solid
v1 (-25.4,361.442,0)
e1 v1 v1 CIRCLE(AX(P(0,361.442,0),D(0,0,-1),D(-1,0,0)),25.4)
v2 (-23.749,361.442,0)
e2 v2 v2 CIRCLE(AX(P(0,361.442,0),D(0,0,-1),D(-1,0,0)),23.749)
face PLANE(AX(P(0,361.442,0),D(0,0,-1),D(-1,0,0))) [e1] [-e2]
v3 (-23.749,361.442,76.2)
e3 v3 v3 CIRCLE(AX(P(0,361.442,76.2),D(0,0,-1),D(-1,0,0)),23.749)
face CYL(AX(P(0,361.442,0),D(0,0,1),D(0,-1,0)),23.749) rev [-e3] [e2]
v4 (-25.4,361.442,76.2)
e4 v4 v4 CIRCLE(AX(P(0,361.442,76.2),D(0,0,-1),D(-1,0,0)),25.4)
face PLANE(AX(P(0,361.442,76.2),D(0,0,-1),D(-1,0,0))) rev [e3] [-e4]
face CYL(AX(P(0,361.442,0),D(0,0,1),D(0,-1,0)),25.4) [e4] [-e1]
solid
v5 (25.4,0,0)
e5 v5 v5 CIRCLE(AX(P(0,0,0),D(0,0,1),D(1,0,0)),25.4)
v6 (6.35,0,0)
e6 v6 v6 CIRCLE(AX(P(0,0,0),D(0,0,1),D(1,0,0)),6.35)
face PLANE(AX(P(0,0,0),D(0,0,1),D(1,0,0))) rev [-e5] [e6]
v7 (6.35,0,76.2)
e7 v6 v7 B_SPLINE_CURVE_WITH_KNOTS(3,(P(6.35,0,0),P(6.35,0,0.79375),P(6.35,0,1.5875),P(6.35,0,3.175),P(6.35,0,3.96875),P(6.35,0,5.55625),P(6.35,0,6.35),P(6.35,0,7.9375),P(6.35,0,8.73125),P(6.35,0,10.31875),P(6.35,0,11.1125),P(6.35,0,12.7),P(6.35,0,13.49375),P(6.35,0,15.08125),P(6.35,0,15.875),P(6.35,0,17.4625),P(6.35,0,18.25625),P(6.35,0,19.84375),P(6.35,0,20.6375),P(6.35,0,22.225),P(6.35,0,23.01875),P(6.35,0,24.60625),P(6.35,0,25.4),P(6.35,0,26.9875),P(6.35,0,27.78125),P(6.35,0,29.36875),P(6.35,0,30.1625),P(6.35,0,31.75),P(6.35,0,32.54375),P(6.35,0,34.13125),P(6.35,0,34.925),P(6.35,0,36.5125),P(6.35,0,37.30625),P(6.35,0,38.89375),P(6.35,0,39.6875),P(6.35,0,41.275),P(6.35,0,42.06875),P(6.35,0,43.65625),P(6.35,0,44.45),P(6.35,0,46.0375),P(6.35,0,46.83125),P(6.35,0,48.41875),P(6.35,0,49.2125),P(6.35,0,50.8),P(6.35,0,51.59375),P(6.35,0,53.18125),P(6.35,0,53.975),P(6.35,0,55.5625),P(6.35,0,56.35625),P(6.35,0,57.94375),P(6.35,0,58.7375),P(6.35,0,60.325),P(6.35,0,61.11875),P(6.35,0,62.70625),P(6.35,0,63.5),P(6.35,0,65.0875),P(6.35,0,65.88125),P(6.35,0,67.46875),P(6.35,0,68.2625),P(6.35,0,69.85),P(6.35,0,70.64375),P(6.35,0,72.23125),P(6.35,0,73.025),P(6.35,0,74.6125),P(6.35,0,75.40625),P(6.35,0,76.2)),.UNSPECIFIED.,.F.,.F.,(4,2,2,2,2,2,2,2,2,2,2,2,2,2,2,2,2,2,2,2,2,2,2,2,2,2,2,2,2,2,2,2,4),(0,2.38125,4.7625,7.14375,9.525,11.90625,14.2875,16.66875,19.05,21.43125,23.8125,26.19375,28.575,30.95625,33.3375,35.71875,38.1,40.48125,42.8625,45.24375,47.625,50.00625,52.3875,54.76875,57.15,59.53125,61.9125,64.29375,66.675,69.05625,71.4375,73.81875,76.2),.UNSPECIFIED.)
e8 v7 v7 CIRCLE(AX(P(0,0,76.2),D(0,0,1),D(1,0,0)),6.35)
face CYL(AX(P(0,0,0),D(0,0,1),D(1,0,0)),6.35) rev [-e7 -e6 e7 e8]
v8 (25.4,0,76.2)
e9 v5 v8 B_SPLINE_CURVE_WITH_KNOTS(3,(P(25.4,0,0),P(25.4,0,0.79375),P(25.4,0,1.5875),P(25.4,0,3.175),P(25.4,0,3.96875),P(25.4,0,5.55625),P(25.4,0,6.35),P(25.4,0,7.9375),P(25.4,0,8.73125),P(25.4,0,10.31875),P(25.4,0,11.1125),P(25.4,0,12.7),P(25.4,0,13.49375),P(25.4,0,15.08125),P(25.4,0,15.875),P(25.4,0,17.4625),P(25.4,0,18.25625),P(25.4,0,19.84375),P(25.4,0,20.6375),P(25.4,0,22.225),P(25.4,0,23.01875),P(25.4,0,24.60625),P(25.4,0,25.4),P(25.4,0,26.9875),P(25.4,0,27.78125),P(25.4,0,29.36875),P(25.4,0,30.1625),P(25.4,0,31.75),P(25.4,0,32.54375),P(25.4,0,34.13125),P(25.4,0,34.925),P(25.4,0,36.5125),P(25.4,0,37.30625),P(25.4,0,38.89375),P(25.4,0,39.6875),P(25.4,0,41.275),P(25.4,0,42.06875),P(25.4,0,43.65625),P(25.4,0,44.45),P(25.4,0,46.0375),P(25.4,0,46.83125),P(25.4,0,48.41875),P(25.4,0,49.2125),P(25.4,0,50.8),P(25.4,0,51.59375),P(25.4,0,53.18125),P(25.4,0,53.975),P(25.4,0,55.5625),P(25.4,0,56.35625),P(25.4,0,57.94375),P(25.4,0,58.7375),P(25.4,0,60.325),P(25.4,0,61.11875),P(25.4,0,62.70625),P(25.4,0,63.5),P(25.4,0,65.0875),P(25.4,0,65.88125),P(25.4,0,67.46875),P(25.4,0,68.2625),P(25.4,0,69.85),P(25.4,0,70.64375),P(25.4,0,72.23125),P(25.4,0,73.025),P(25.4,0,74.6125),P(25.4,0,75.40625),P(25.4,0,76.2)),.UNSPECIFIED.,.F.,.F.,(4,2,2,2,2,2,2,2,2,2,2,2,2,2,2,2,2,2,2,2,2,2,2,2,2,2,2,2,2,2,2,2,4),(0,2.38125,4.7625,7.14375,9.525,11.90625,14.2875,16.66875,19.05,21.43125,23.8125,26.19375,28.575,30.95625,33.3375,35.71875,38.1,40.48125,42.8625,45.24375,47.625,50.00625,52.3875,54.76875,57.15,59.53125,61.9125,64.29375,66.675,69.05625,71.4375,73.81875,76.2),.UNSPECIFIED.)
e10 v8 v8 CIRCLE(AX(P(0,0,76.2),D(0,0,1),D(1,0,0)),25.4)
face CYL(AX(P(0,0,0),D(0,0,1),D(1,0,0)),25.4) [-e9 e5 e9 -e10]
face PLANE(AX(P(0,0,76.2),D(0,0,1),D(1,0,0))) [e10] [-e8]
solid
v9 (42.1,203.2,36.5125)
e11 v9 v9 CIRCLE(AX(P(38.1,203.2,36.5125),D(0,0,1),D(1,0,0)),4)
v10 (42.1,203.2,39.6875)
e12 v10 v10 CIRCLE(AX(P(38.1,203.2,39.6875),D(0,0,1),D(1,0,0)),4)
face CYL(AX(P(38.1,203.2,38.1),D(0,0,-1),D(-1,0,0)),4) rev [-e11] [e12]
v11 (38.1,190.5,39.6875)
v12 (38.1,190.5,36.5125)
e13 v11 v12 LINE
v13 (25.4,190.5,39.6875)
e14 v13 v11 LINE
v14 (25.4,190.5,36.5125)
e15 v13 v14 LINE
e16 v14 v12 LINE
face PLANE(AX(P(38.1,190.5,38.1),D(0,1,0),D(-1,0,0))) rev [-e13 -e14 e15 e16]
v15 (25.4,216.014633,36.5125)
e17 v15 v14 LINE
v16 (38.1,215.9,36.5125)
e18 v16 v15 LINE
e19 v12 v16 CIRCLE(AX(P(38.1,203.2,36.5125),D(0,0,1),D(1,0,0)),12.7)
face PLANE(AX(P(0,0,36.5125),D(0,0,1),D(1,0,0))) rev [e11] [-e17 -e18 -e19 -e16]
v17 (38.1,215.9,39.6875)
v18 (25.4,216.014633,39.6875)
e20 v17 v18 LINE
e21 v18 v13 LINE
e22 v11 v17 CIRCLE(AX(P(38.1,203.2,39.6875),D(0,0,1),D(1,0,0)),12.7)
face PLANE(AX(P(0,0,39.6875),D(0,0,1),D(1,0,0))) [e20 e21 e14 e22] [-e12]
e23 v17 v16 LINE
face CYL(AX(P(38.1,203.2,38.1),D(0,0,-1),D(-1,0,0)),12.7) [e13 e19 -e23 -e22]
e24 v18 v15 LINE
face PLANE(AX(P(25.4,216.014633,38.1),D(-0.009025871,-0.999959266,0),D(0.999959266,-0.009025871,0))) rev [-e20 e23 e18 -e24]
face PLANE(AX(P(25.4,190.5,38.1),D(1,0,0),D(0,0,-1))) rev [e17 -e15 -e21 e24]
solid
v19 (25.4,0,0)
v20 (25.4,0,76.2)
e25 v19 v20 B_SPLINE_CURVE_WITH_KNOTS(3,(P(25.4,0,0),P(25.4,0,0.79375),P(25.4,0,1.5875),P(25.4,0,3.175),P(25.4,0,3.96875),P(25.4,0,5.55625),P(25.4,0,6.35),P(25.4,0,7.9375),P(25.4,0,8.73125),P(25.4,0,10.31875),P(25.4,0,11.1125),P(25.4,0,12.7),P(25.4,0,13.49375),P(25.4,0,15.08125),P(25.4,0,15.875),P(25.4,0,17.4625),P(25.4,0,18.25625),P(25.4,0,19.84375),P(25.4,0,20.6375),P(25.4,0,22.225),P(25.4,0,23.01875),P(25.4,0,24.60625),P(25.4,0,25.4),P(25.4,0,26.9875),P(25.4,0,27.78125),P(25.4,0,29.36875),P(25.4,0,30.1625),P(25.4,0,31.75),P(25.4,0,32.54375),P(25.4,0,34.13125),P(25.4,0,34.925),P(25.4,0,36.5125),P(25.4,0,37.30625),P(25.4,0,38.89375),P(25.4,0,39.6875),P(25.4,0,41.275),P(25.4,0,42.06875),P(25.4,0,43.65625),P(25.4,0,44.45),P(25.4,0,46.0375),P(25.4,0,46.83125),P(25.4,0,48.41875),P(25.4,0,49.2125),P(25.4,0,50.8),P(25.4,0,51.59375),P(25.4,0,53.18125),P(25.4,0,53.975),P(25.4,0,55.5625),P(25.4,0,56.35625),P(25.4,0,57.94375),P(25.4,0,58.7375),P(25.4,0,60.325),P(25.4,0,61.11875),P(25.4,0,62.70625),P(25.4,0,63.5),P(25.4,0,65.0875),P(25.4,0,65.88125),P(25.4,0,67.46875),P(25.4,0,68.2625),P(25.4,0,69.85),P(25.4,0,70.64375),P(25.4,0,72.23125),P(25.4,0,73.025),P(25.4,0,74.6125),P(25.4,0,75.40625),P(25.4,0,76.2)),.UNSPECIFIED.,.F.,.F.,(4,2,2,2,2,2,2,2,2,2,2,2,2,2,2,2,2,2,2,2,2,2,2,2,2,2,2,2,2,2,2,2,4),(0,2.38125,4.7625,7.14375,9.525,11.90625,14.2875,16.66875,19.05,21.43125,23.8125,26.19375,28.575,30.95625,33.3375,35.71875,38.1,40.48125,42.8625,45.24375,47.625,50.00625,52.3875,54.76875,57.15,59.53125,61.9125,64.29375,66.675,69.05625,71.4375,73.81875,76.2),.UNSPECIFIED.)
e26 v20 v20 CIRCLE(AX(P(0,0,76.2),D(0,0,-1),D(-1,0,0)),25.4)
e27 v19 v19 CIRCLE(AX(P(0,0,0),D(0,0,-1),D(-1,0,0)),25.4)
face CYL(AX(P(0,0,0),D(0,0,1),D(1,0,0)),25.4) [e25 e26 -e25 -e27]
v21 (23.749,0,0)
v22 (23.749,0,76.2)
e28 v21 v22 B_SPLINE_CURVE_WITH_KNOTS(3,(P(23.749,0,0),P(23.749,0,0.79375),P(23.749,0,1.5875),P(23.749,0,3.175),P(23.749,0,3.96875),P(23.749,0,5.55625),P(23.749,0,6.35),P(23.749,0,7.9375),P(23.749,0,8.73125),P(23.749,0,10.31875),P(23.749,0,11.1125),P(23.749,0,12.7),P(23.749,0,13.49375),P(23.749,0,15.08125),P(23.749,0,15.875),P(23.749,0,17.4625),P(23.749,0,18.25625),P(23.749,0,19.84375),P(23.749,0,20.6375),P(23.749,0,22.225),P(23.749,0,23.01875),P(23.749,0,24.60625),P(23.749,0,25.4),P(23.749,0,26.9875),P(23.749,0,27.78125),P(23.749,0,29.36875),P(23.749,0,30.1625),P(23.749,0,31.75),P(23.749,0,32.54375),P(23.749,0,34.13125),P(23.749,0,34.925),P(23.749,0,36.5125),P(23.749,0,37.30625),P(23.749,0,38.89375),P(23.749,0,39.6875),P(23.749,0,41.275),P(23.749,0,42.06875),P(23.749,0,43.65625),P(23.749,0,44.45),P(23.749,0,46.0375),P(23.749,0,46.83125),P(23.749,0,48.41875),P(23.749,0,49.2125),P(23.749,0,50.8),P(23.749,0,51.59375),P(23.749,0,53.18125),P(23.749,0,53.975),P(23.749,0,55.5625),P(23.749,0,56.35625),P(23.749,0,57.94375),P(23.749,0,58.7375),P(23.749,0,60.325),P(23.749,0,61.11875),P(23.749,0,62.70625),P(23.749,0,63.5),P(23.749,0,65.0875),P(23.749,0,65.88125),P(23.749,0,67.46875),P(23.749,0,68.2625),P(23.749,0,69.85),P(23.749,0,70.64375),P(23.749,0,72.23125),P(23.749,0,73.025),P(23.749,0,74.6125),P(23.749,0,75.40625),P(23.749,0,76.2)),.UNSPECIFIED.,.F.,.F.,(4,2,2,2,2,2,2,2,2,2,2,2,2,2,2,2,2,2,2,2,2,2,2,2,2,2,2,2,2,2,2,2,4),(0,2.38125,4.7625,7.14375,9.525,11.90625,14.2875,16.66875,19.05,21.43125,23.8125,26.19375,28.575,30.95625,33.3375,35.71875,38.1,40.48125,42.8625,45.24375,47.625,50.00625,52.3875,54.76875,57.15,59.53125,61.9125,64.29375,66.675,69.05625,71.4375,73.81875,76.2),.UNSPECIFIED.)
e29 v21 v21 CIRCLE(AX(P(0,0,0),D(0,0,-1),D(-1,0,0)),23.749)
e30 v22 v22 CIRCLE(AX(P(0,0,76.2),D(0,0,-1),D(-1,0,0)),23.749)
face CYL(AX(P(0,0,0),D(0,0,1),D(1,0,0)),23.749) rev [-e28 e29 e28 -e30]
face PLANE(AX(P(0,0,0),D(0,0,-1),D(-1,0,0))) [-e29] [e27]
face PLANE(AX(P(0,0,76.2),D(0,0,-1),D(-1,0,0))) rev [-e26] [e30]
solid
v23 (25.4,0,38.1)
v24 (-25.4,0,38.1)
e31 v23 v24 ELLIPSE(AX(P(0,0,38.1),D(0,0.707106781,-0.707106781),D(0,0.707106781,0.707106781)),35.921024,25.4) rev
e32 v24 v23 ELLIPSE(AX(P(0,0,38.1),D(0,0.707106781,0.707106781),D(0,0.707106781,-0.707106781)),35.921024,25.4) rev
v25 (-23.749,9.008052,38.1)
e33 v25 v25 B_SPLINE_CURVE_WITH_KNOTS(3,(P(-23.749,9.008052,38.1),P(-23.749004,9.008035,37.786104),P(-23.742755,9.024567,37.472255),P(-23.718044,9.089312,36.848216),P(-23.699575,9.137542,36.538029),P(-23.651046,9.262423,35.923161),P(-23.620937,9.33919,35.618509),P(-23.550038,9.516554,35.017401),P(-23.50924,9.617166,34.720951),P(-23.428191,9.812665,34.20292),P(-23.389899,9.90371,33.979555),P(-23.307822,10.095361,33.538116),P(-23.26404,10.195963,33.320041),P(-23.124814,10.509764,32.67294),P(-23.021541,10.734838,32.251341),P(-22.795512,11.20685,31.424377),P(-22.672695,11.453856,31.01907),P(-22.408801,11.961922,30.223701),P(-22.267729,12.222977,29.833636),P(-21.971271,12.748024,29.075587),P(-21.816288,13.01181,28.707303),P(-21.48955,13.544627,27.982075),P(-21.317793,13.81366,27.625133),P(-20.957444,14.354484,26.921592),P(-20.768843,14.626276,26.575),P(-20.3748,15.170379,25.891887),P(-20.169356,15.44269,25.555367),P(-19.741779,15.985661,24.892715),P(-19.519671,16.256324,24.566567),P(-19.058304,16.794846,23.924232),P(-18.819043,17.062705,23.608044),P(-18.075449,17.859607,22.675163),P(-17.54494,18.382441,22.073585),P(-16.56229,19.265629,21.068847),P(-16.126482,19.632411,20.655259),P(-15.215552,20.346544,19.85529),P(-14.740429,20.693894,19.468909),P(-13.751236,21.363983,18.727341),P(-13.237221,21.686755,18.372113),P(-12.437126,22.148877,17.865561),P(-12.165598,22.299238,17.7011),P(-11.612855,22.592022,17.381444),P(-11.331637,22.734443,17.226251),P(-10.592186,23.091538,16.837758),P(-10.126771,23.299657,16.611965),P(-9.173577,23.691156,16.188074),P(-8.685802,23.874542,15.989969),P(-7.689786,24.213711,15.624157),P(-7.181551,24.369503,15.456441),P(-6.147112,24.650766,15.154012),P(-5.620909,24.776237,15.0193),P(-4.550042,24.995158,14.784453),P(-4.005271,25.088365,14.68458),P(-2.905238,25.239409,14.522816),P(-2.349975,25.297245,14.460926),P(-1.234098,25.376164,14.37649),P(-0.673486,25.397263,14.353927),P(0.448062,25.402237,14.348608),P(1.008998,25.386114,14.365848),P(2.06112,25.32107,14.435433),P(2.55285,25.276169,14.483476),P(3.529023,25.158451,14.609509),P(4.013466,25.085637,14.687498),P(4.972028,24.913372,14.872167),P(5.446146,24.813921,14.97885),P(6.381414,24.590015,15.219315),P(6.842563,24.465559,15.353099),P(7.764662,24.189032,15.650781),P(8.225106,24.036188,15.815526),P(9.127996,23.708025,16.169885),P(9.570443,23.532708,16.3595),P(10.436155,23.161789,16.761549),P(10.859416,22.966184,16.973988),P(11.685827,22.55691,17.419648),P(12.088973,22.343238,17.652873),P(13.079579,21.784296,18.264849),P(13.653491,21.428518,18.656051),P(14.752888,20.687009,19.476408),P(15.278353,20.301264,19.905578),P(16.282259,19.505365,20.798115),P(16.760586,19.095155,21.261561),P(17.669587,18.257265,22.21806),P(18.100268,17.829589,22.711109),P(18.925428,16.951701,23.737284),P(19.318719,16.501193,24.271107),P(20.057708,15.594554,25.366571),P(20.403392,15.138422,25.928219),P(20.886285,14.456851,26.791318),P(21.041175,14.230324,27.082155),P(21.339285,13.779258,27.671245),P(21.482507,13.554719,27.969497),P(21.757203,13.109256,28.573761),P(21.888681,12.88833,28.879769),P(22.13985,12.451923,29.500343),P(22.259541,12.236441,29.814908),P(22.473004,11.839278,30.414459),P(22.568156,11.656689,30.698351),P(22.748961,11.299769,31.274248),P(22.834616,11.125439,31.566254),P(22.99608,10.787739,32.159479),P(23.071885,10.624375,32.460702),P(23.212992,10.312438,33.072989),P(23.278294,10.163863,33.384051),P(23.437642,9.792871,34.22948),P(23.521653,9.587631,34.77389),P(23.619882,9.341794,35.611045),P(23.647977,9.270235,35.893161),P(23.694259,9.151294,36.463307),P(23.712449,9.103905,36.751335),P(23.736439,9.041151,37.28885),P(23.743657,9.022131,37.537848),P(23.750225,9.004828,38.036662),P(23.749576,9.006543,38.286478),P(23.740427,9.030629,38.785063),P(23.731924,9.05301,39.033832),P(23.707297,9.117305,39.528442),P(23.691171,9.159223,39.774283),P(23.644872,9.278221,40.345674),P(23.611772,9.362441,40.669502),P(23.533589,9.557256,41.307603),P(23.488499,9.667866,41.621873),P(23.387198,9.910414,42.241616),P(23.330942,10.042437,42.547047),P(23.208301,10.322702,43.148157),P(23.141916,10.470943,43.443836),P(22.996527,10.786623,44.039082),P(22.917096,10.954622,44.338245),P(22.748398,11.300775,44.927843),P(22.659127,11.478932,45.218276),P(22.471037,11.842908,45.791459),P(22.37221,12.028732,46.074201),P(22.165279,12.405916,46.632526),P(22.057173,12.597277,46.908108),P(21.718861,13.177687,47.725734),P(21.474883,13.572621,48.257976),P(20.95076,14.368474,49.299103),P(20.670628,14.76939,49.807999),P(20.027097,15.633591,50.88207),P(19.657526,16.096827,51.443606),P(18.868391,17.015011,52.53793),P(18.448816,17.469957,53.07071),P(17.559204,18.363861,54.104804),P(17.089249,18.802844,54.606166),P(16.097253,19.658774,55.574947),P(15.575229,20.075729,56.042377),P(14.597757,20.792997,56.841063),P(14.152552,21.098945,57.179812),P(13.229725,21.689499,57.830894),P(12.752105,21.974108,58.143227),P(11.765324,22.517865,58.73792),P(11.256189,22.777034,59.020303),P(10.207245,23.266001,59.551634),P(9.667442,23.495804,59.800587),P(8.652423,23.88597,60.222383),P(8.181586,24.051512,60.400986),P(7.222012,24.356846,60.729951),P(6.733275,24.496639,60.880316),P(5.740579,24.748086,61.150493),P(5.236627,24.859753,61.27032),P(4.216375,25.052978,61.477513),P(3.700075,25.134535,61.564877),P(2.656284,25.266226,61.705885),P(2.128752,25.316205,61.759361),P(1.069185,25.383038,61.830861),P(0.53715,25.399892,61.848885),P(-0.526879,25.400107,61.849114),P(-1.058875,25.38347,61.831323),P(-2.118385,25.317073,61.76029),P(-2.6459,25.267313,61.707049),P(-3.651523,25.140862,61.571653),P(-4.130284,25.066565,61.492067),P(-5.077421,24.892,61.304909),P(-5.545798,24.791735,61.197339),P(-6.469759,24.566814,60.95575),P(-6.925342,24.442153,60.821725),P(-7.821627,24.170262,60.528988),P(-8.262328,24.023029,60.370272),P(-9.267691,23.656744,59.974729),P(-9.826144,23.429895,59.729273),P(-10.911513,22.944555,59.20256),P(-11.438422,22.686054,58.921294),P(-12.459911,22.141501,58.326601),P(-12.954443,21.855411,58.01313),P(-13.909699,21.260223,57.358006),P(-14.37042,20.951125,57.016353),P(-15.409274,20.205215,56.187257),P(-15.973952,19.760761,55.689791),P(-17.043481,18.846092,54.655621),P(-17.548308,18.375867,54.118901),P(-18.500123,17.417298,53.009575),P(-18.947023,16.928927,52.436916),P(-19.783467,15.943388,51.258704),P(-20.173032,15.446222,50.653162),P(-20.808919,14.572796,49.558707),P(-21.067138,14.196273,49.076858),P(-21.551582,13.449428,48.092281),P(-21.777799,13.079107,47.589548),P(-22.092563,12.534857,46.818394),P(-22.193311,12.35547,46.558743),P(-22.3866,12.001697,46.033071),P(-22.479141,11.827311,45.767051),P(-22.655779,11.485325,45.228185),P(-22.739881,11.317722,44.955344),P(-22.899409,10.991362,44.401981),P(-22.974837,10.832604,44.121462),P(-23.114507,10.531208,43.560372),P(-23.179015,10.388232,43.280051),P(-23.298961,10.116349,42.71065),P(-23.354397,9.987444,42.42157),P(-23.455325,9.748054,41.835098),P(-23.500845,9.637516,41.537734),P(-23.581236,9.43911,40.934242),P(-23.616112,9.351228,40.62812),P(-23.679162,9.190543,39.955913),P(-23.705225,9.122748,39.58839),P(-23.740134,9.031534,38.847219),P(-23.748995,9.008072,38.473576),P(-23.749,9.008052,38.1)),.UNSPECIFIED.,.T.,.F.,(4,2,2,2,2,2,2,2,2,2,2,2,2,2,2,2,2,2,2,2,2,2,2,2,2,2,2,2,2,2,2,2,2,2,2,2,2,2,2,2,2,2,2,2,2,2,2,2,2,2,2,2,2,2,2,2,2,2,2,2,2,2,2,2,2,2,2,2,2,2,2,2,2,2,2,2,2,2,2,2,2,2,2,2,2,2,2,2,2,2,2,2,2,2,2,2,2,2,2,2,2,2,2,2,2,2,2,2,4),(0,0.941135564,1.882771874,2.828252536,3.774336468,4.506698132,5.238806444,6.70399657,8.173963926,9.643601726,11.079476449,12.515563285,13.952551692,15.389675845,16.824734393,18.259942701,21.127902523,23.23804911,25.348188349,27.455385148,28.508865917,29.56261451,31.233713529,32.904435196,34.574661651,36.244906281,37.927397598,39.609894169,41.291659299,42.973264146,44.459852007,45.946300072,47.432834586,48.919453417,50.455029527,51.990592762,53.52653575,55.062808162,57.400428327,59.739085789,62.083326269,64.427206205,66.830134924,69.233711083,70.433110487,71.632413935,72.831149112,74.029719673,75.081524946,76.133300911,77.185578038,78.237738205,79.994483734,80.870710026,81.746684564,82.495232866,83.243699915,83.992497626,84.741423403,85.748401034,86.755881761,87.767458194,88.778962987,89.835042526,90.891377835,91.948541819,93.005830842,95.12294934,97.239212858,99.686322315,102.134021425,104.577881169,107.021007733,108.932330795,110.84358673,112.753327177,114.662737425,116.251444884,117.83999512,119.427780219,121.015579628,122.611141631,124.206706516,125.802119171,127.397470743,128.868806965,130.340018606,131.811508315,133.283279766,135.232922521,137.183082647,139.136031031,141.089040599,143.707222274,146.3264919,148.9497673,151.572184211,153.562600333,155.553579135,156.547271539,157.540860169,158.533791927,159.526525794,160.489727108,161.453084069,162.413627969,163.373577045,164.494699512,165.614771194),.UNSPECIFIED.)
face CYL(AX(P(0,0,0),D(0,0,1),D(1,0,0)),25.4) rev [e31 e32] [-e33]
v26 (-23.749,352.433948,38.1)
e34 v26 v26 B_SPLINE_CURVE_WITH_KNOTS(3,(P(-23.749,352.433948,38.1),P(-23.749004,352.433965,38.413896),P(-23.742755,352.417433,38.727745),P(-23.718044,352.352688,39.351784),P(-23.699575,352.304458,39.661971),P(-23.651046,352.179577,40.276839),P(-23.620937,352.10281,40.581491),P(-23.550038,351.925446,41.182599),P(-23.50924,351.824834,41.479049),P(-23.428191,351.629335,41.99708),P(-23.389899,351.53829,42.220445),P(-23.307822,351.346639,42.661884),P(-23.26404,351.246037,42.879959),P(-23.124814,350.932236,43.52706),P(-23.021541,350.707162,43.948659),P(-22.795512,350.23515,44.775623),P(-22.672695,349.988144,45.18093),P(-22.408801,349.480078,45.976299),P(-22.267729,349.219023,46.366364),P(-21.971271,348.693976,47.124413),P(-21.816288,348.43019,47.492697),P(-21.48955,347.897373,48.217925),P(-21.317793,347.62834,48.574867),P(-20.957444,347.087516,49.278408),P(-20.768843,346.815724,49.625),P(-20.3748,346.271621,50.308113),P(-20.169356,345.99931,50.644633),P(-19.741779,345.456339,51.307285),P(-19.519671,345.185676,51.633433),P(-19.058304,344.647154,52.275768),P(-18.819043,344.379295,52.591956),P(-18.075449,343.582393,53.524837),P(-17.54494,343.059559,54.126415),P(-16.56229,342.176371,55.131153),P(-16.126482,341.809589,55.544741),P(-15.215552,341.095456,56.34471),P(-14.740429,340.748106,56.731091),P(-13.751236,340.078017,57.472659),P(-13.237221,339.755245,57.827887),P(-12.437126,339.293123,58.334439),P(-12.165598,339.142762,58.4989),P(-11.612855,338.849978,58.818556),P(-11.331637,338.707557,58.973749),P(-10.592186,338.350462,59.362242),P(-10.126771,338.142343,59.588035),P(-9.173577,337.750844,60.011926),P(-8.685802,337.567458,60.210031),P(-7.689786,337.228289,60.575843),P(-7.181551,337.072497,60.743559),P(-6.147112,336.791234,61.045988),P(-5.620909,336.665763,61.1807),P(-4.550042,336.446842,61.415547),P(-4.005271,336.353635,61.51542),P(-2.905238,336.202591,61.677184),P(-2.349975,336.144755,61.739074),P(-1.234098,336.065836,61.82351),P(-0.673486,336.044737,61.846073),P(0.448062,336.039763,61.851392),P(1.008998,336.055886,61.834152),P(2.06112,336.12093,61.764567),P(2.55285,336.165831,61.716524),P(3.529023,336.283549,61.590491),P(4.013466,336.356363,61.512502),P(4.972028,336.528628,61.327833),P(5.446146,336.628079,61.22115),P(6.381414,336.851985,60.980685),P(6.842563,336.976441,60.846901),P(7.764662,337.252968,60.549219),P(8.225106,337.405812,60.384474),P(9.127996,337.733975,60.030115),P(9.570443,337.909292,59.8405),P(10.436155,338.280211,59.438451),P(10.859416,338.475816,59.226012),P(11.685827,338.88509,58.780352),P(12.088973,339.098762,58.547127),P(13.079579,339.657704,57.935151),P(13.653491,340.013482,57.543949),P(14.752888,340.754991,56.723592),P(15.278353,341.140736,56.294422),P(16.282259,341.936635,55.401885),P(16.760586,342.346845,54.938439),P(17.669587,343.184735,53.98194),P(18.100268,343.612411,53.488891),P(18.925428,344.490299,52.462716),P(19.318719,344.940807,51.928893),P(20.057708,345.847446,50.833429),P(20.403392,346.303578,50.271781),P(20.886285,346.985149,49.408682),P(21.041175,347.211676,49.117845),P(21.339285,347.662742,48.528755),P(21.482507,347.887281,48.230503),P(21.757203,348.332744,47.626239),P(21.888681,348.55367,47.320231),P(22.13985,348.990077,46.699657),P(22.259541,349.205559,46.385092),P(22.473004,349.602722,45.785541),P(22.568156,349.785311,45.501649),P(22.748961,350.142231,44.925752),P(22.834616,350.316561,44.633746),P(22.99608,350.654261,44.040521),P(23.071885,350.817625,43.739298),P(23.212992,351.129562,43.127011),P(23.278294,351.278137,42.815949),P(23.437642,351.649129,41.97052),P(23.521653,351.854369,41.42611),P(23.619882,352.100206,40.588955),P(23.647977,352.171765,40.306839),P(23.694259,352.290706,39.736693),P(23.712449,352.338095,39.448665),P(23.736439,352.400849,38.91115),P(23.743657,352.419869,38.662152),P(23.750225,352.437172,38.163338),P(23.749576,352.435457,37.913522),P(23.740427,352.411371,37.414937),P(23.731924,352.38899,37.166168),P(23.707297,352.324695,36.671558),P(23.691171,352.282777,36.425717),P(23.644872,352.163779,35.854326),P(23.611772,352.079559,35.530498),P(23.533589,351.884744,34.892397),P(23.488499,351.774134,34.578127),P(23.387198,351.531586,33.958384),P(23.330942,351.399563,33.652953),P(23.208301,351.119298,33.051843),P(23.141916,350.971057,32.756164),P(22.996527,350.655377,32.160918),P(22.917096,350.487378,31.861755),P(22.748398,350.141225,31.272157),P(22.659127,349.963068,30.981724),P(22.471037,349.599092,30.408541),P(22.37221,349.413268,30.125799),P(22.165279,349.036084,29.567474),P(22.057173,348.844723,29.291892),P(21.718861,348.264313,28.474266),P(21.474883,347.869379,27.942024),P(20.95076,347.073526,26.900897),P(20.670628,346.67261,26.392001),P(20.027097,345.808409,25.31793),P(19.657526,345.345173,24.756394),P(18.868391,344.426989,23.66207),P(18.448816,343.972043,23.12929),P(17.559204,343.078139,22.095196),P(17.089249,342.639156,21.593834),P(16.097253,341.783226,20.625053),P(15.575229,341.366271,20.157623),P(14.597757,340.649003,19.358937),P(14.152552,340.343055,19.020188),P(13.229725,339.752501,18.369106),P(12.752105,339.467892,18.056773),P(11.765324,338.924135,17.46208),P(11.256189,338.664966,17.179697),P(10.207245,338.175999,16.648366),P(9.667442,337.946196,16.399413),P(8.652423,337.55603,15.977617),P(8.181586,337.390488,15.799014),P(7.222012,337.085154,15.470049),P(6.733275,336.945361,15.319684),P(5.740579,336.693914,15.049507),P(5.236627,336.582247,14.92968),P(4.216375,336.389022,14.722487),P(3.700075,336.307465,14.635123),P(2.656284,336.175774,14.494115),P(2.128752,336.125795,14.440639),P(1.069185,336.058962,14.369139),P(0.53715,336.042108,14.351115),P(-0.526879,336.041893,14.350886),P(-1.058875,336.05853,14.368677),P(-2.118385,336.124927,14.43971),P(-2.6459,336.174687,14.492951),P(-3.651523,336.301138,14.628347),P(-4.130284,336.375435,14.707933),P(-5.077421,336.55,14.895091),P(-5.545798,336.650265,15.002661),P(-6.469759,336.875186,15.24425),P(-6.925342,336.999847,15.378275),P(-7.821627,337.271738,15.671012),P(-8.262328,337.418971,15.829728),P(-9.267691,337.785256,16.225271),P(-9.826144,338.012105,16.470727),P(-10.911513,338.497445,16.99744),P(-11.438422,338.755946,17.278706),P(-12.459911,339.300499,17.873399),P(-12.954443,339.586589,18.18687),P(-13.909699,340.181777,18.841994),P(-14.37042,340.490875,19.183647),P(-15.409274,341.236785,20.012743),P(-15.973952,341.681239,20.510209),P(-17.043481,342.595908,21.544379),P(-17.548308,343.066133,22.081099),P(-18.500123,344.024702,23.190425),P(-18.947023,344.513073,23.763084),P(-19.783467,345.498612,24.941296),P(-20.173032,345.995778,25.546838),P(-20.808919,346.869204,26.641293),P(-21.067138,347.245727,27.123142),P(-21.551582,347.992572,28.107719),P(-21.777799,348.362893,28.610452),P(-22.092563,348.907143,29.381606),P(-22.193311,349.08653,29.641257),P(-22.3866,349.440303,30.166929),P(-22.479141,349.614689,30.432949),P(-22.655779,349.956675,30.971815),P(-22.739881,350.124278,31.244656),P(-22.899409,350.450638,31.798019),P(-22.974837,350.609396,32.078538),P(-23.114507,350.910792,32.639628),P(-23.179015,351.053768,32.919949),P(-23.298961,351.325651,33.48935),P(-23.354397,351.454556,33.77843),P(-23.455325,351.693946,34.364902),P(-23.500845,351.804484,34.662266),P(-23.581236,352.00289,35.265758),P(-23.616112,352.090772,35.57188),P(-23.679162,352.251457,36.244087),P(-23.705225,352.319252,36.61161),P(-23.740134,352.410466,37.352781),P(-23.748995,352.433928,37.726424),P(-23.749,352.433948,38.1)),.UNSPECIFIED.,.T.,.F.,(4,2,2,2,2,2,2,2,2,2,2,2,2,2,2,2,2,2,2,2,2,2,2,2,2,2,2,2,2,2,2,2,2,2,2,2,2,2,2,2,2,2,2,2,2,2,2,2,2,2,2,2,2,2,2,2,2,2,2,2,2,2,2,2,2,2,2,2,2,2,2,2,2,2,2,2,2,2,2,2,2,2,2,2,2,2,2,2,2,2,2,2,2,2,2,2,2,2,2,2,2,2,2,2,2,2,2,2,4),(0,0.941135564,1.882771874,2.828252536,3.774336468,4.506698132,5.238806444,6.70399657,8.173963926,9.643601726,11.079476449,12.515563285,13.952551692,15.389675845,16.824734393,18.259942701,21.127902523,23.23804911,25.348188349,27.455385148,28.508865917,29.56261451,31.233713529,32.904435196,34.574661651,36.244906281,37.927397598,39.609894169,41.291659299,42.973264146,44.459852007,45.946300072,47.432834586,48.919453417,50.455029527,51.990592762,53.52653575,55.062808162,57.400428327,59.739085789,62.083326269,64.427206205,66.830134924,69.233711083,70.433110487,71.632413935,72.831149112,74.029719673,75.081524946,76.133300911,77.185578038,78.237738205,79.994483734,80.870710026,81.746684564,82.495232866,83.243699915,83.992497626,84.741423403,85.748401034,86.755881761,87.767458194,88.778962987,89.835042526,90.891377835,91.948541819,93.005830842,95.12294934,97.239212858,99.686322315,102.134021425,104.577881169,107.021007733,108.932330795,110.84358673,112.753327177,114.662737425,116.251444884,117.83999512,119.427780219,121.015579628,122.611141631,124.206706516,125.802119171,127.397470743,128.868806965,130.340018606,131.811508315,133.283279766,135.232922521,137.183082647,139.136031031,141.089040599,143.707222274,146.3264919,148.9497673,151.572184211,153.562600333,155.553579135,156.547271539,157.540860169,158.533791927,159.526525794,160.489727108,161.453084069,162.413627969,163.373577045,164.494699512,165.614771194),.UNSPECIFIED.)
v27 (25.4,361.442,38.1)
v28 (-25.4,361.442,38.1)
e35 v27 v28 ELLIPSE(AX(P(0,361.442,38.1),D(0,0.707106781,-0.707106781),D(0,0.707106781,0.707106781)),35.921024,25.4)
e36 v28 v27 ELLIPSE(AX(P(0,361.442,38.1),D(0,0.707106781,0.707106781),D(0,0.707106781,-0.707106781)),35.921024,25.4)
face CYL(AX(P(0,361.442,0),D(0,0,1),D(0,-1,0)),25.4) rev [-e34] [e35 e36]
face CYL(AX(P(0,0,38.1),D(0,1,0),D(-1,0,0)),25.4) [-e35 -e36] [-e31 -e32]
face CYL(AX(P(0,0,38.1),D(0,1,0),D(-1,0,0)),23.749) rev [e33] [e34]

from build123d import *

# Parameters (mm, degrees)
AL_START                                     = -1e-07
AL_ROUND_TUBING_2_OD_X_0_063_WALL_1_OUTL_R   = 25.4
AL_ROUND_TUBING_2_OD_X_0_063_WALL_1_OUTL_R_2 = 23.749
AL_ROUND_TUBING_2_OD_X_0_063_WALL_1_DEPTH    = 361.4420002
AL_START_2                                   = 12
AL_ROUND_TUBING_2_OD_X_0_063_WALL_1_2_DEPTH  = 52
AL_ROUND_TUBING_2_OD_X_0_063_WALL_1_3_OU_R   = 25.4
AL_ROUND_TUBING_2_OD_X_0_063_WALL_1_3_OU_R_2 = 23.749
AL_ROUND_TUBING_2_OD_X_0_063_WALL_1_3_DEPTH  = 76.2
AL_ROUND_TUBING_2_OD_X_0_063_WALL_1_4_OU_R   = 25.4
AL_ROUND_TUBING_2_OD_X_0_063_WALL_1_4_OU_R_2 = 23.749
AL_ROUND_TUBING_2_OD_X_0_063_WALL_1_4_DEPTH  = 76.2
SKETCH13_R                                   = 25.4
SKETCH13_R_2                                 = 6.35
BOSS_EXTRUDE1_DEPTH                          = 76.2
BOSS_EXTRUDE2_DEPTH                          = 1.5875
BOSS_EXTRUDE2_DEPTH_BACK                     = 1.5875
F_3DSKETCH2_R                                = 4


with BuildPart() as part:
    # Al round tubing 2 OD X 0.063 WALL(1): read off the stored shape, not the designer's step
    # Al round tubing 2 OD X 0.063 WALL(1) outl → Al round tubing 2 OD X 0.063 WALL(1) (new body)
    with BuildSketch(Plane(origin=(0, 0, 0), x_dir=(1, 0, 0), z_dir=(0, 1, 0)).offset(AL_START)):
        with Locations((0, -38.1)):
            Circle(AL_ROUND_TUBING_2_OD_X_0_063_WALL_1_OUTL_R)
        with Locations((0, -38.1)):
            Circle(AL_ROUND_TUBING_2_OD_X_0_063_WALL_1_OUTL_R_2, mode=Mode.SUBTRACT)
    extrude(amount=AL_ROUND_TUBING_2_OD_X_0_063_WALL_1_DEPTH)

    # Al round tubing 2 OD X 0.063 WALL_1 2 ou → Al round tubing 2 OD X 0.063 WALL_1 2 (cut)
    with BuildSketch(Plane.XY.offset(AL_START_2)):
        with BuildLine():
            Line((-25.4, 0), (25.4, 0))
            ThreePointArc((25.4, 0), (0, 25.4), (-25.4, 0))
        make_face()
        with BuildLine():
            Line((25.4, 361.442), (-25.4, 361.442))
            ThreePointArc((-25.4, 361.442), (0, 336.042), (25.4, 361.442))
        make_face()
    extrude(amount=AL_ROUND_TUBING_2_OD_X_0_063_WALL_1_2_DEPTH, mode=Mode.SUBTRACT)


with BuildPart() as body_2:
    # Al round tubing 2 OD X 0.063 WALL_1 3 ou → Al round tubing 2 OD X 0.063 WALL_1 3 (new body)
    with BuildSketch(Plane.XY):
        with Locations((0, 361.442)):
            Circle(AL_ROUND_TUBING_2_OD_X_0_063_WALL_1_3_OU_R)
        with Locations((0, 361.442)):
            Circle(AL_ROUND_TUBING_2_OD_X_0_063_WALL_1_3_OU_R_2, mode=Mode.SUBTRACT)
    extrude(amount=AL_ROUND_TUBING_2_OD_X_0_063_WALL_1_3_DEPTH)


with BuildPart() as body_3:
    # Al round tubing 2 OD X 0.063 WALL_1 4 ou → Al round tubing 2 OD X 0.063 WALL_1 4 (new body)
    with BuildSketch(Plane.XY):
        Circle(AL_ROUND_TUBING_2_OD_X_0_063_WALL_1_4_OU_R)
        Circle(AL_ROUND_TUBING_2_OD_X_0_063_WALL_1_4_OU_R_2, mode=Mode.SUBTRACT)
    extrude(amount=AL_ROUND_TUBING_2_OD_X_0_063_WALL_1_4_DEPTH)


with BuildPart() as body_4:
    # Sketch13 → Boss-Extrude1 (new body)
    with BuildSketch(Plane.XY.offset(76.2)):
        Circle(SKETCH13_R)
        Circle(SKETCH13_R_2, mode=Mode.SUBTRACT)
    extrude(amount=-BOSS_EXTRUDE1_DEPTH)


with BuildPart() as body_5:
    # 3DSketch2 → Boss-Extrude2 (new, two sides: drawn at the far end of the back side and taken through both)
    with BuildSketch(Plane(origin=(38.1, 190.5, 38.1), x_dir=(-0.4456040206434466, 0.895230169725303, 0), z_dir=(0, 0, 1)).offset(-BOSS_EXTRUDE2_DEPTH_BACK)):
        with BuildLine():
            Line((0, 0), (5.659171062, 11.369423156))
            Line((5.659171062, 11.369423156), (28.500640505, 0))
            Line((28.500640505, 0), (22.738846311, -11.318342124))
            ThreePointArc((22.738846311, -11.318342124), (5.710252093, -17.028594218), (0, 0))
        make_face()
        with Locations(Location((11.369423156, -5.659171062, 0), (0, 0, 243.538009692))):
            Circle(F_3DSKETCH2_R, mode=Mode.SUBTRACT)
    extrude(amount=BOSS_EXTRUDE2_DEPTH + BOSS_EXTRUDE2_DEPTH_BACK)


solid = Compound([part.part, body_2.part, body_3.part, body_4.part, body_5.part])
